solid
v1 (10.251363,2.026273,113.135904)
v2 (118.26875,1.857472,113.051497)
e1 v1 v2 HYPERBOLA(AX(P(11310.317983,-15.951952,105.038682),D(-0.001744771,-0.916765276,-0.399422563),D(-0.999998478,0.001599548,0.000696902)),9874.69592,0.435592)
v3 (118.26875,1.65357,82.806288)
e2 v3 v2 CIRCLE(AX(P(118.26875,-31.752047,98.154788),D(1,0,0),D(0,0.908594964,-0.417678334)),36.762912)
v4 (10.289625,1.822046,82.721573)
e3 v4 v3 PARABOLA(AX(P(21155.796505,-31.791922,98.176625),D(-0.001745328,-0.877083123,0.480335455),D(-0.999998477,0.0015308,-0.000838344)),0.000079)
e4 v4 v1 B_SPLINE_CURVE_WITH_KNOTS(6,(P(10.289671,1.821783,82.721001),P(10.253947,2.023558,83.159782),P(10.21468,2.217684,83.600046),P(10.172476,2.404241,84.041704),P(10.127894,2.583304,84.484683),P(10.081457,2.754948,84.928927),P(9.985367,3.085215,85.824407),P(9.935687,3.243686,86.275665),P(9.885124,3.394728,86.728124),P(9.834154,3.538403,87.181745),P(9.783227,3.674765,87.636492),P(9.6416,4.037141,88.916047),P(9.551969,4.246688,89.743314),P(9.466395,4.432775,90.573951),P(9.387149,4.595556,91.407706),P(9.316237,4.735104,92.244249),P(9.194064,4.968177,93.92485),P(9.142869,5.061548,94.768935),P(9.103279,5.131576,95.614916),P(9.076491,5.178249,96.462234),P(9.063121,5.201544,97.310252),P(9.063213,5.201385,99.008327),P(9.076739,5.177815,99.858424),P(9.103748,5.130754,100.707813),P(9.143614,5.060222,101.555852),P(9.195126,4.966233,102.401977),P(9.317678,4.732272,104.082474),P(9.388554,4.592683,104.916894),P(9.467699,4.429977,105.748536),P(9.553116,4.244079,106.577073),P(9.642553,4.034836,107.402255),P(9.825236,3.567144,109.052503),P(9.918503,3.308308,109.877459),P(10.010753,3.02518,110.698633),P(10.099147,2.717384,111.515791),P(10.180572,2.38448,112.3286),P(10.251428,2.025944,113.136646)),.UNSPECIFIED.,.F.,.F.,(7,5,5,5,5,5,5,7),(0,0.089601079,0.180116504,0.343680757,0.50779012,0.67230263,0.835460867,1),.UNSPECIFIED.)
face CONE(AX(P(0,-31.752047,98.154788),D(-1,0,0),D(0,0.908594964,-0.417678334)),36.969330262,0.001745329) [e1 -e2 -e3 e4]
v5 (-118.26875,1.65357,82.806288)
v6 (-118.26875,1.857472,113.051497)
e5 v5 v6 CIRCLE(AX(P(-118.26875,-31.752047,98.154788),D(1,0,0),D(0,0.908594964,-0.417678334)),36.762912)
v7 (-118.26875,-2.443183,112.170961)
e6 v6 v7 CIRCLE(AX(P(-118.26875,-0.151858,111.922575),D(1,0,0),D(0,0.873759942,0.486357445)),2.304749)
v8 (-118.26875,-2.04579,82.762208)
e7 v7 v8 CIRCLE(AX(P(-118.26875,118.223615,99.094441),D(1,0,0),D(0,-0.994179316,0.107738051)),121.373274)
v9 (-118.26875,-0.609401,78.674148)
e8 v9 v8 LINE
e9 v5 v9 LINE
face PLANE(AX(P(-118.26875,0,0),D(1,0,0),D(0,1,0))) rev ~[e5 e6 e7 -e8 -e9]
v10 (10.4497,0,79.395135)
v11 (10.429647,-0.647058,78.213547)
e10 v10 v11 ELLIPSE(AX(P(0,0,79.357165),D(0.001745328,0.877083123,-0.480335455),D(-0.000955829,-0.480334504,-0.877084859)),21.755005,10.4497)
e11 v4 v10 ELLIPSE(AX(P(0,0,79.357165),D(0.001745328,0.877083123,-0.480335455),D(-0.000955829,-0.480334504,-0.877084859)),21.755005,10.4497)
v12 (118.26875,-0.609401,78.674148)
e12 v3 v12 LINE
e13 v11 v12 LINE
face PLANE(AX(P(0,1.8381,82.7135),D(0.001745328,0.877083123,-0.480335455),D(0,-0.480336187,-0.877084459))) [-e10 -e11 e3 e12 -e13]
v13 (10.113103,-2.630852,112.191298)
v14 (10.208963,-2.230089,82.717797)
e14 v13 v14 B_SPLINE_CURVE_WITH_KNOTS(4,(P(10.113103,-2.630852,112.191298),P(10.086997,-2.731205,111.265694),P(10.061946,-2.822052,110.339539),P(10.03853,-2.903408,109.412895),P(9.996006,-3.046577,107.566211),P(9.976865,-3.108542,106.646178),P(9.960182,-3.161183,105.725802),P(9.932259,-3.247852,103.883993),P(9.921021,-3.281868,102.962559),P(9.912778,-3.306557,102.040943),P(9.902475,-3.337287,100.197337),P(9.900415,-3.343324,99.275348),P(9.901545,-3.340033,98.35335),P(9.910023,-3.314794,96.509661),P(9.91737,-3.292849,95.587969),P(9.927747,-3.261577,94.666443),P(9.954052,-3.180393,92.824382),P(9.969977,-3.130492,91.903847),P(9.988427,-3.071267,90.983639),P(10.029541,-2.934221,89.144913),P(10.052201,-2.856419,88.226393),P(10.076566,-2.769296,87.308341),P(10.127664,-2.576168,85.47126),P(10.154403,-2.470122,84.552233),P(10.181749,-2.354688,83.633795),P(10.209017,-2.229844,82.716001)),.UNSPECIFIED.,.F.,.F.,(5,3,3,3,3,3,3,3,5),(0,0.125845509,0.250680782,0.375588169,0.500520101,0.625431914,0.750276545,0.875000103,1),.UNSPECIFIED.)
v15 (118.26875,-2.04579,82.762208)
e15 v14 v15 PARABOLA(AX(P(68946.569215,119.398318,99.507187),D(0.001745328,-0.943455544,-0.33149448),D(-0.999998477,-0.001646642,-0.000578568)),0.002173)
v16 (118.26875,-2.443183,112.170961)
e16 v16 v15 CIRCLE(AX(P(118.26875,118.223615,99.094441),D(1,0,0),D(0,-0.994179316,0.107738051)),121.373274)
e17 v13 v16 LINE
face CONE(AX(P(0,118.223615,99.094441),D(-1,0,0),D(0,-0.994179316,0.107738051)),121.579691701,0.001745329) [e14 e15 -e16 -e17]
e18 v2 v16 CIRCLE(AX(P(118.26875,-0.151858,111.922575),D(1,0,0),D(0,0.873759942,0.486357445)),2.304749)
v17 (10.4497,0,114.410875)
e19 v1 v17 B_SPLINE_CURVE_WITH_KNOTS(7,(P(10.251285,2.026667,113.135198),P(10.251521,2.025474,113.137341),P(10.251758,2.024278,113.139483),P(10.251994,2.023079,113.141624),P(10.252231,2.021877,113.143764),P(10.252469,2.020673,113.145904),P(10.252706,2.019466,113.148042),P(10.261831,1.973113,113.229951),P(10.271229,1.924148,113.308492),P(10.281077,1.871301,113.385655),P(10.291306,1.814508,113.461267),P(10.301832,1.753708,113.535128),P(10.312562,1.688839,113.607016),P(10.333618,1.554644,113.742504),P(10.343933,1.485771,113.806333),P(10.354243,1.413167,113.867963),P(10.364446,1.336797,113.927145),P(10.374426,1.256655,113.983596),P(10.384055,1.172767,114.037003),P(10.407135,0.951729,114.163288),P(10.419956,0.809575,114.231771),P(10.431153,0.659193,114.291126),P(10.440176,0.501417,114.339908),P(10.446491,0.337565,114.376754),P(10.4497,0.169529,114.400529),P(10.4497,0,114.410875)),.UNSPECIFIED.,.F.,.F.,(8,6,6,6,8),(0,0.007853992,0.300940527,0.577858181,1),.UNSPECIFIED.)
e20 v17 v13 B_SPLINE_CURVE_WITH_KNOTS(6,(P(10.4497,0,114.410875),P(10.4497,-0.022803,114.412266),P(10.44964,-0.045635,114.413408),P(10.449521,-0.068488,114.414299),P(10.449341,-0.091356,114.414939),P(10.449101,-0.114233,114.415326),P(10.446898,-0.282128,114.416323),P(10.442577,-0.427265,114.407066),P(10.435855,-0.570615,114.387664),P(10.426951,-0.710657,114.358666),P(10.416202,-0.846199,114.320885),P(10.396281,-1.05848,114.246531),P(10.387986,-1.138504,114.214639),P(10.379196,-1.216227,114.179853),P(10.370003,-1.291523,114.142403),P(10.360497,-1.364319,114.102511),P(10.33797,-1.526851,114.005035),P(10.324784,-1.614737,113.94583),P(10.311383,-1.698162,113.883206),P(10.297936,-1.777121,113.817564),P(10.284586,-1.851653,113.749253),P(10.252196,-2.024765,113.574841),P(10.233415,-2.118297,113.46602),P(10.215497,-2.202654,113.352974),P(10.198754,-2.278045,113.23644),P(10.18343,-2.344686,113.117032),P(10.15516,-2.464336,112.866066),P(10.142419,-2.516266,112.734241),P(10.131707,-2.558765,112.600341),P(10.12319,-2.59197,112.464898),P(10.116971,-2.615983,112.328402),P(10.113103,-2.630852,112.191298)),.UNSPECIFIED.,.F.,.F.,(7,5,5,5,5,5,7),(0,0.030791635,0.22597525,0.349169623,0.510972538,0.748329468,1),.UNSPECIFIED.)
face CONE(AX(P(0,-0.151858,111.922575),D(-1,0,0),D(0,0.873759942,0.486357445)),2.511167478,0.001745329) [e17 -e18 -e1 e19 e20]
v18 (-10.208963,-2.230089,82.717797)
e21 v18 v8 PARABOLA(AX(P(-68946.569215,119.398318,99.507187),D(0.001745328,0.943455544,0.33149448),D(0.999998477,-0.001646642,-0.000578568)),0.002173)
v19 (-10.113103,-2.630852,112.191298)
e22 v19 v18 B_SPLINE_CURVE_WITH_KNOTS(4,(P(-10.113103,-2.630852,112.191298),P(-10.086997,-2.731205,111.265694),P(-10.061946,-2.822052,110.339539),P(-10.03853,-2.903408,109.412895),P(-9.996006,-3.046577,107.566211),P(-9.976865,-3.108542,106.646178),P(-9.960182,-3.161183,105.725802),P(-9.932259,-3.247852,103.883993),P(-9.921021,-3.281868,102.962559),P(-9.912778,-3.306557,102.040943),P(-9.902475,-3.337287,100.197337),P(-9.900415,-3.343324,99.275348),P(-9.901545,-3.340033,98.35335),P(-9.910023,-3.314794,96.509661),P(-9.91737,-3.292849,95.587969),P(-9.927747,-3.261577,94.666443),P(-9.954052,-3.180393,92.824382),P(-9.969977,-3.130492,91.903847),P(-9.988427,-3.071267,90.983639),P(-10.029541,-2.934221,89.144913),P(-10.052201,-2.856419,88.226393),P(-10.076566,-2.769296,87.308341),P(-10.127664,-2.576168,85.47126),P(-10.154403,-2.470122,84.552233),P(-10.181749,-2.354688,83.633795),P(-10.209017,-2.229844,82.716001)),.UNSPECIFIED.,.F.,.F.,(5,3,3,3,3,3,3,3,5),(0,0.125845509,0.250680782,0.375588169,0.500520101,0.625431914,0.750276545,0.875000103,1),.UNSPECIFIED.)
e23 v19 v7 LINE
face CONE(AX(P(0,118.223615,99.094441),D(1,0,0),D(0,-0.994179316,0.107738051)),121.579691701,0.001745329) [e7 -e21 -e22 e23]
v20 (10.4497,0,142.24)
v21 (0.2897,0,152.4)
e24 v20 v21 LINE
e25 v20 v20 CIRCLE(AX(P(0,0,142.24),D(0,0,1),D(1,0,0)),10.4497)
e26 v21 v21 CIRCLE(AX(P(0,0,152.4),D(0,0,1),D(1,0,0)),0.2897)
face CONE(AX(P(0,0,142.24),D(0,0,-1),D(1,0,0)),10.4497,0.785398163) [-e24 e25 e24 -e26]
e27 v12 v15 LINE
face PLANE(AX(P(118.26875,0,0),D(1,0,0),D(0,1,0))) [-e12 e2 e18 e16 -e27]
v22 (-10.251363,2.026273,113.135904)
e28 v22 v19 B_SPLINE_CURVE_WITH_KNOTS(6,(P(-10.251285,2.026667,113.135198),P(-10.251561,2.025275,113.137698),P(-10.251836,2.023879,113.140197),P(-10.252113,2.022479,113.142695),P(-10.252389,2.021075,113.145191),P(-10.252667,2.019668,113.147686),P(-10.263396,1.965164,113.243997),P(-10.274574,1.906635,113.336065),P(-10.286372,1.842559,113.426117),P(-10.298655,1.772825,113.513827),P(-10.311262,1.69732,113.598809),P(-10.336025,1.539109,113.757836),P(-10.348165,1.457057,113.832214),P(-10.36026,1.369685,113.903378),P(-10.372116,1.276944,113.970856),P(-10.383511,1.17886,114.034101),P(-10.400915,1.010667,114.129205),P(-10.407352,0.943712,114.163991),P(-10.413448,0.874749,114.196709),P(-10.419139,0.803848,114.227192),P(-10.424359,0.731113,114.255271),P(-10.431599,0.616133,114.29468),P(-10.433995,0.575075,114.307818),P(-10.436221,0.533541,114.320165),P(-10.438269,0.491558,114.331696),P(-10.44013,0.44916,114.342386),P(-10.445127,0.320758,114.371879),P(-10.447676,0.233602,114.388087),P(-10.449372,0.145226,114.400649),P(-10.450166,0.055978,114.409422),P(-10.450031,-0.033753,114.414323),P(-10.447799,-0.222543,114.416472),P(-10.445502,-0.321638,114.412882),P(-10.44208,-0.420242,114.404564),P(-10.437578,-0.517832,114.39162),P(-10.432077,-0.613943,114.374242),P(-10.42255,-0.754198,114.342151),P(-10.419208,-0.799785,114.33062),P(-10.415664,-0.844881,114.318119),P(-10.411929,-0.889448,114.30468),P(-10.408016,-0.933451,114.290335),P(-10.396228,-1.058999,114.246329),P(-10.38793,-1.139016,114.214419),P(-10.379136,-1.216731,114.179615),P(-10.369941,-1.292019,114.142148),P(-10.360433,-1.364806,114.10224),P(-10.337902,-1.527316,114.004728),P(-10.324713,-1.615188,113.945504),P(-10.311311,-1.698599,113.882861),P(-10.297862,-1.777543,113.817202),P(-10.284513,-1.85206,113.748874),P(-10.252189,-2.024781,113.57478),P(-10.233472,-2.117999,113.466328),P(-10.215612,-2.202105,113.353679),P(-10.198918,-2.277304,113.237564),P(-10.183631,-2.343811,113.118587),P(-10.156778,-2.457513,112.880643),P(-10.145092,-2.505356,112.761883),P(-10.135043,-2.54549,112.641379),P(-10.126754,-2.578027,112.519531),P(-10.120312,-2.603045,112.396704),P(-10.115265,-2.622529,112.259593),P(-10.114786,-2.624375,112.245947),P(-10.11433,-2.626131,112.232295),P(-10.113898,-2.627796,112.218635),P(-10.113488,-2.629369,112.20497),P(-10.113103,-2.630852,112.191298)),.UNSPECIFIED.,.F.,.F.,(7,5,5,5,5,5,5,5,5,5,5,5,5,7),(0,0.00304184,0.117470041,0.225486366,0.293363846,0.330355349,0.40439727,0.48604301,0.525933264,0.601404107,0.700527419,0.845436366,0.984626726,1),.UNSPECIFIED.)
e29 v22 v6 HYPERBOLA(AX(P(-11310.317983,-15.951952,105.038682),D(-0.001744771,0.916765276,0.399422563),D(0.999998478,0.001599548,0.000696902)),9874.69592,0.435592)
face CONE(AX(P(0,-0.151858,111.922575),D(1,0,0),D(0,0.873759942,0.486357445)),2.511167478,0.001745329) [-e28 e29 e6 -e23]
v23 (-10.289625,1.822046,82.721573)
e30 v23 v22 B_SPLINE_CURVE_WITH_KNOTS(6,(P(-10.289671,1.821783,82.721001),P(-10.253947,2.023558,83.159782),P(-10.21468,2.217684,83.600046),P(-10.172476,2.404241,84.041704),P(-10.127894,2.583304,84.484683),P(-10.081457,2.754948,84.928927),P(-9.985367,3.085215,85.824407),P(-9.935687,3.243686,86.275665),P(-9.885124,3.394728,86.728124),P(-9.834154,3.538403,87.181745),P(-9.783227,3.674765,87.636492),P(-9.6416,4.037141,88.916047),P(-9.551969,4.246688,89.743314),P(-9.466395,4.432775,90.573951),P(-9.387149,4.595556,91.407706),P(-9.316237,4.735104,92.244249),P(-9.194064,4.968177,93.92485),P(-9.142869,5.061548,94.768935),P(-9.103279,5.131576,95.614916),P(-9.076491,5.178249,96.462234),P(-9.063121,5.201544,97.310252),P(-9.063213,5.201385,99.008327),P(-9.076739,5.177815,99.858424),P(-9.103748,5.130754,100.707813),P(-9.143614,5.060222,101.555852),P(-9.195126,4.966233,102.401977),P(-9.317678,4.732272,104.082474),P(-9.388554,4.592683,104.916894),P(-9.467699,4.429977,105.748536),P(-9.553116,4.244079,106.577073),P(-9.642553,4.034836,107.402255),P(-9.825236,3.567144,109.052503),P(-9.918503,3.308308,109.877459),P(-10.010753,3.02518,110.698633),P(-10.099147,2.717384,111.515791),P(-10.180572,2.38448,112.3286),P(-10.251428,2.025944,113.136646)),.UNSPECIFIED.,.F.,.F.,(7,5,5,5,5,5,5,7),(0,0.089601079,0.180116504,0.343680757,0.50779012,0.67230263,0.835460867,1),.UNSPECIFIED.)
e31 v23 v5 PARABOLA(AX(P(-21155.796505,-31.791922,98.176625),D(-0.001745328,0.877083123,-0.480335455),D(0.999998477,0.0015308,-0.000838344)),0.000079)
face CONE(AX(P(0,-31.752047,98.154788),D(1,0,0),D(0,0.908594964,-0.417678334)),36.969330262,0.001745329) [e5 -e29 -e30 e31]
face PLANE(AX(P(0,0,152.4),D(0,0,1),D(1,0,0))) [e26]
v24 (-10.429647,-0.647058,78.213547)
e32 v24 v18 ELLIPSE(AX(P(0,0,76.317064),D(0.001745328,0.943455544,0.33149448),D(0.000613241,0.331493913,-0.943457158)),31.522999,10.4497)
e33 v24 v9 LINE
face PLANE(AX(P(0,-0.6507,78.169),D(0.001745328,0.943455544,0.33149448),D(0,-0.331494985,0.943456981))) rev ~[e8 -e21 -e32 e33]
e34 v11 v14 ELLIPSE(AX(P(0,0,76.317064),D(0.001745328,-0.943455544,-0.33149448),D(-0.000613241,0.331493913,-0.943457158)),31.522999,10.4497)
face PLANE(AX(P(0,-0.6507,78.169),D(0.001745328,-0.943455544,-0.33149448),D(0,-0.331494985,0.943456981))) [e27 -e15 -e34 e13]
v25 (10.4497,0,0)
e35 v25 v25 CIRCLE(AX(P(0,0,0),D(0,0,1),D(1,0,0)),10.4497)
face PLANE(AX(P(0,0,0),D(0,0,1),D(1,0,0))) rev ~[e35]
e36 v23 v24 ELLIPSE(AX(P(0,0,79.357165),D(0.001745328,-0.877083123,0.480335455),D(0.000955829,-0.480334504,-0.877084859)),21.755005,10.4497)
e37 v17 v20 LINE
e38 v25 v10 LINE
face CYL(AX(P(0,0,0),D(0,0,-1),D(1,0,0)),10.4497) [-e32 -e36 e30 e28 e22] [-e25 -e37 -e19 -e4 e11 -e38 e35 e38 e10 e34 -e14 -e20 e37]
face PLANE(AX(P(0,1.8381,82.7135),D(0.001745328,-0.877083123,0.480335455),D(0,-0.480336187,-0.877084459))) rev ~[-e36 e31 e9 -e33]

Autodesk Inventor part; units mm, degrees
ref_plane "XZ Plane" through (0, 0, 0) normal (0, 1, 0) x (-1, 0, 0)
ref_plane "XY Plane" through (0, 0, 0) normal (0, 0, 1) x (1, 0, 0)
sketch "Sketch1" plane through (0, 0, 0) normal (0, 0, 1) x (1, 0, 0)
  circle A0 centre (0, 0) radius 10.4497
extrude "Extrusion1" add sketch "Sketch1" along normal blind 152.4
ref_plane "Work Plane1" through (0, 0, 0) normal (1, 0, 0) x (0, 1, 0)
sketch "Sketch2" plane through (0, 0, 0) normal (1, 0, 0) x (0, 1, 0)
  arc A0 (1.8381, 82.7135) -> (2.0423, 113.1439) centre (-31.7521, 98.1548) ccw
  arc A1 (-2.6484, 112.1932) -> (-2.2475, 82.7136) centre (118.2266, 99.0943) ccw
  arc A2 (2.0423, 113.1439) -> (-2.6484, 112.1932) centre (-0.1518, 111.9227) ccw
  line L0 (1.8381, 82.7135) -> (-0.6507, 78.169)
  line L1 (-0.6507, 78.169) -> (-2.2475, 82.7136)
  point P0 (0, 0)
extrude "Extrusion2" add sketch "Sketch2" along normal mid plane 236.5375 draft -0.1
chamfer "Chamfer1" distance 10.16 angle 45 1 edges at (-10.4497, 0, 152.4)
properties part number "airfoil"
